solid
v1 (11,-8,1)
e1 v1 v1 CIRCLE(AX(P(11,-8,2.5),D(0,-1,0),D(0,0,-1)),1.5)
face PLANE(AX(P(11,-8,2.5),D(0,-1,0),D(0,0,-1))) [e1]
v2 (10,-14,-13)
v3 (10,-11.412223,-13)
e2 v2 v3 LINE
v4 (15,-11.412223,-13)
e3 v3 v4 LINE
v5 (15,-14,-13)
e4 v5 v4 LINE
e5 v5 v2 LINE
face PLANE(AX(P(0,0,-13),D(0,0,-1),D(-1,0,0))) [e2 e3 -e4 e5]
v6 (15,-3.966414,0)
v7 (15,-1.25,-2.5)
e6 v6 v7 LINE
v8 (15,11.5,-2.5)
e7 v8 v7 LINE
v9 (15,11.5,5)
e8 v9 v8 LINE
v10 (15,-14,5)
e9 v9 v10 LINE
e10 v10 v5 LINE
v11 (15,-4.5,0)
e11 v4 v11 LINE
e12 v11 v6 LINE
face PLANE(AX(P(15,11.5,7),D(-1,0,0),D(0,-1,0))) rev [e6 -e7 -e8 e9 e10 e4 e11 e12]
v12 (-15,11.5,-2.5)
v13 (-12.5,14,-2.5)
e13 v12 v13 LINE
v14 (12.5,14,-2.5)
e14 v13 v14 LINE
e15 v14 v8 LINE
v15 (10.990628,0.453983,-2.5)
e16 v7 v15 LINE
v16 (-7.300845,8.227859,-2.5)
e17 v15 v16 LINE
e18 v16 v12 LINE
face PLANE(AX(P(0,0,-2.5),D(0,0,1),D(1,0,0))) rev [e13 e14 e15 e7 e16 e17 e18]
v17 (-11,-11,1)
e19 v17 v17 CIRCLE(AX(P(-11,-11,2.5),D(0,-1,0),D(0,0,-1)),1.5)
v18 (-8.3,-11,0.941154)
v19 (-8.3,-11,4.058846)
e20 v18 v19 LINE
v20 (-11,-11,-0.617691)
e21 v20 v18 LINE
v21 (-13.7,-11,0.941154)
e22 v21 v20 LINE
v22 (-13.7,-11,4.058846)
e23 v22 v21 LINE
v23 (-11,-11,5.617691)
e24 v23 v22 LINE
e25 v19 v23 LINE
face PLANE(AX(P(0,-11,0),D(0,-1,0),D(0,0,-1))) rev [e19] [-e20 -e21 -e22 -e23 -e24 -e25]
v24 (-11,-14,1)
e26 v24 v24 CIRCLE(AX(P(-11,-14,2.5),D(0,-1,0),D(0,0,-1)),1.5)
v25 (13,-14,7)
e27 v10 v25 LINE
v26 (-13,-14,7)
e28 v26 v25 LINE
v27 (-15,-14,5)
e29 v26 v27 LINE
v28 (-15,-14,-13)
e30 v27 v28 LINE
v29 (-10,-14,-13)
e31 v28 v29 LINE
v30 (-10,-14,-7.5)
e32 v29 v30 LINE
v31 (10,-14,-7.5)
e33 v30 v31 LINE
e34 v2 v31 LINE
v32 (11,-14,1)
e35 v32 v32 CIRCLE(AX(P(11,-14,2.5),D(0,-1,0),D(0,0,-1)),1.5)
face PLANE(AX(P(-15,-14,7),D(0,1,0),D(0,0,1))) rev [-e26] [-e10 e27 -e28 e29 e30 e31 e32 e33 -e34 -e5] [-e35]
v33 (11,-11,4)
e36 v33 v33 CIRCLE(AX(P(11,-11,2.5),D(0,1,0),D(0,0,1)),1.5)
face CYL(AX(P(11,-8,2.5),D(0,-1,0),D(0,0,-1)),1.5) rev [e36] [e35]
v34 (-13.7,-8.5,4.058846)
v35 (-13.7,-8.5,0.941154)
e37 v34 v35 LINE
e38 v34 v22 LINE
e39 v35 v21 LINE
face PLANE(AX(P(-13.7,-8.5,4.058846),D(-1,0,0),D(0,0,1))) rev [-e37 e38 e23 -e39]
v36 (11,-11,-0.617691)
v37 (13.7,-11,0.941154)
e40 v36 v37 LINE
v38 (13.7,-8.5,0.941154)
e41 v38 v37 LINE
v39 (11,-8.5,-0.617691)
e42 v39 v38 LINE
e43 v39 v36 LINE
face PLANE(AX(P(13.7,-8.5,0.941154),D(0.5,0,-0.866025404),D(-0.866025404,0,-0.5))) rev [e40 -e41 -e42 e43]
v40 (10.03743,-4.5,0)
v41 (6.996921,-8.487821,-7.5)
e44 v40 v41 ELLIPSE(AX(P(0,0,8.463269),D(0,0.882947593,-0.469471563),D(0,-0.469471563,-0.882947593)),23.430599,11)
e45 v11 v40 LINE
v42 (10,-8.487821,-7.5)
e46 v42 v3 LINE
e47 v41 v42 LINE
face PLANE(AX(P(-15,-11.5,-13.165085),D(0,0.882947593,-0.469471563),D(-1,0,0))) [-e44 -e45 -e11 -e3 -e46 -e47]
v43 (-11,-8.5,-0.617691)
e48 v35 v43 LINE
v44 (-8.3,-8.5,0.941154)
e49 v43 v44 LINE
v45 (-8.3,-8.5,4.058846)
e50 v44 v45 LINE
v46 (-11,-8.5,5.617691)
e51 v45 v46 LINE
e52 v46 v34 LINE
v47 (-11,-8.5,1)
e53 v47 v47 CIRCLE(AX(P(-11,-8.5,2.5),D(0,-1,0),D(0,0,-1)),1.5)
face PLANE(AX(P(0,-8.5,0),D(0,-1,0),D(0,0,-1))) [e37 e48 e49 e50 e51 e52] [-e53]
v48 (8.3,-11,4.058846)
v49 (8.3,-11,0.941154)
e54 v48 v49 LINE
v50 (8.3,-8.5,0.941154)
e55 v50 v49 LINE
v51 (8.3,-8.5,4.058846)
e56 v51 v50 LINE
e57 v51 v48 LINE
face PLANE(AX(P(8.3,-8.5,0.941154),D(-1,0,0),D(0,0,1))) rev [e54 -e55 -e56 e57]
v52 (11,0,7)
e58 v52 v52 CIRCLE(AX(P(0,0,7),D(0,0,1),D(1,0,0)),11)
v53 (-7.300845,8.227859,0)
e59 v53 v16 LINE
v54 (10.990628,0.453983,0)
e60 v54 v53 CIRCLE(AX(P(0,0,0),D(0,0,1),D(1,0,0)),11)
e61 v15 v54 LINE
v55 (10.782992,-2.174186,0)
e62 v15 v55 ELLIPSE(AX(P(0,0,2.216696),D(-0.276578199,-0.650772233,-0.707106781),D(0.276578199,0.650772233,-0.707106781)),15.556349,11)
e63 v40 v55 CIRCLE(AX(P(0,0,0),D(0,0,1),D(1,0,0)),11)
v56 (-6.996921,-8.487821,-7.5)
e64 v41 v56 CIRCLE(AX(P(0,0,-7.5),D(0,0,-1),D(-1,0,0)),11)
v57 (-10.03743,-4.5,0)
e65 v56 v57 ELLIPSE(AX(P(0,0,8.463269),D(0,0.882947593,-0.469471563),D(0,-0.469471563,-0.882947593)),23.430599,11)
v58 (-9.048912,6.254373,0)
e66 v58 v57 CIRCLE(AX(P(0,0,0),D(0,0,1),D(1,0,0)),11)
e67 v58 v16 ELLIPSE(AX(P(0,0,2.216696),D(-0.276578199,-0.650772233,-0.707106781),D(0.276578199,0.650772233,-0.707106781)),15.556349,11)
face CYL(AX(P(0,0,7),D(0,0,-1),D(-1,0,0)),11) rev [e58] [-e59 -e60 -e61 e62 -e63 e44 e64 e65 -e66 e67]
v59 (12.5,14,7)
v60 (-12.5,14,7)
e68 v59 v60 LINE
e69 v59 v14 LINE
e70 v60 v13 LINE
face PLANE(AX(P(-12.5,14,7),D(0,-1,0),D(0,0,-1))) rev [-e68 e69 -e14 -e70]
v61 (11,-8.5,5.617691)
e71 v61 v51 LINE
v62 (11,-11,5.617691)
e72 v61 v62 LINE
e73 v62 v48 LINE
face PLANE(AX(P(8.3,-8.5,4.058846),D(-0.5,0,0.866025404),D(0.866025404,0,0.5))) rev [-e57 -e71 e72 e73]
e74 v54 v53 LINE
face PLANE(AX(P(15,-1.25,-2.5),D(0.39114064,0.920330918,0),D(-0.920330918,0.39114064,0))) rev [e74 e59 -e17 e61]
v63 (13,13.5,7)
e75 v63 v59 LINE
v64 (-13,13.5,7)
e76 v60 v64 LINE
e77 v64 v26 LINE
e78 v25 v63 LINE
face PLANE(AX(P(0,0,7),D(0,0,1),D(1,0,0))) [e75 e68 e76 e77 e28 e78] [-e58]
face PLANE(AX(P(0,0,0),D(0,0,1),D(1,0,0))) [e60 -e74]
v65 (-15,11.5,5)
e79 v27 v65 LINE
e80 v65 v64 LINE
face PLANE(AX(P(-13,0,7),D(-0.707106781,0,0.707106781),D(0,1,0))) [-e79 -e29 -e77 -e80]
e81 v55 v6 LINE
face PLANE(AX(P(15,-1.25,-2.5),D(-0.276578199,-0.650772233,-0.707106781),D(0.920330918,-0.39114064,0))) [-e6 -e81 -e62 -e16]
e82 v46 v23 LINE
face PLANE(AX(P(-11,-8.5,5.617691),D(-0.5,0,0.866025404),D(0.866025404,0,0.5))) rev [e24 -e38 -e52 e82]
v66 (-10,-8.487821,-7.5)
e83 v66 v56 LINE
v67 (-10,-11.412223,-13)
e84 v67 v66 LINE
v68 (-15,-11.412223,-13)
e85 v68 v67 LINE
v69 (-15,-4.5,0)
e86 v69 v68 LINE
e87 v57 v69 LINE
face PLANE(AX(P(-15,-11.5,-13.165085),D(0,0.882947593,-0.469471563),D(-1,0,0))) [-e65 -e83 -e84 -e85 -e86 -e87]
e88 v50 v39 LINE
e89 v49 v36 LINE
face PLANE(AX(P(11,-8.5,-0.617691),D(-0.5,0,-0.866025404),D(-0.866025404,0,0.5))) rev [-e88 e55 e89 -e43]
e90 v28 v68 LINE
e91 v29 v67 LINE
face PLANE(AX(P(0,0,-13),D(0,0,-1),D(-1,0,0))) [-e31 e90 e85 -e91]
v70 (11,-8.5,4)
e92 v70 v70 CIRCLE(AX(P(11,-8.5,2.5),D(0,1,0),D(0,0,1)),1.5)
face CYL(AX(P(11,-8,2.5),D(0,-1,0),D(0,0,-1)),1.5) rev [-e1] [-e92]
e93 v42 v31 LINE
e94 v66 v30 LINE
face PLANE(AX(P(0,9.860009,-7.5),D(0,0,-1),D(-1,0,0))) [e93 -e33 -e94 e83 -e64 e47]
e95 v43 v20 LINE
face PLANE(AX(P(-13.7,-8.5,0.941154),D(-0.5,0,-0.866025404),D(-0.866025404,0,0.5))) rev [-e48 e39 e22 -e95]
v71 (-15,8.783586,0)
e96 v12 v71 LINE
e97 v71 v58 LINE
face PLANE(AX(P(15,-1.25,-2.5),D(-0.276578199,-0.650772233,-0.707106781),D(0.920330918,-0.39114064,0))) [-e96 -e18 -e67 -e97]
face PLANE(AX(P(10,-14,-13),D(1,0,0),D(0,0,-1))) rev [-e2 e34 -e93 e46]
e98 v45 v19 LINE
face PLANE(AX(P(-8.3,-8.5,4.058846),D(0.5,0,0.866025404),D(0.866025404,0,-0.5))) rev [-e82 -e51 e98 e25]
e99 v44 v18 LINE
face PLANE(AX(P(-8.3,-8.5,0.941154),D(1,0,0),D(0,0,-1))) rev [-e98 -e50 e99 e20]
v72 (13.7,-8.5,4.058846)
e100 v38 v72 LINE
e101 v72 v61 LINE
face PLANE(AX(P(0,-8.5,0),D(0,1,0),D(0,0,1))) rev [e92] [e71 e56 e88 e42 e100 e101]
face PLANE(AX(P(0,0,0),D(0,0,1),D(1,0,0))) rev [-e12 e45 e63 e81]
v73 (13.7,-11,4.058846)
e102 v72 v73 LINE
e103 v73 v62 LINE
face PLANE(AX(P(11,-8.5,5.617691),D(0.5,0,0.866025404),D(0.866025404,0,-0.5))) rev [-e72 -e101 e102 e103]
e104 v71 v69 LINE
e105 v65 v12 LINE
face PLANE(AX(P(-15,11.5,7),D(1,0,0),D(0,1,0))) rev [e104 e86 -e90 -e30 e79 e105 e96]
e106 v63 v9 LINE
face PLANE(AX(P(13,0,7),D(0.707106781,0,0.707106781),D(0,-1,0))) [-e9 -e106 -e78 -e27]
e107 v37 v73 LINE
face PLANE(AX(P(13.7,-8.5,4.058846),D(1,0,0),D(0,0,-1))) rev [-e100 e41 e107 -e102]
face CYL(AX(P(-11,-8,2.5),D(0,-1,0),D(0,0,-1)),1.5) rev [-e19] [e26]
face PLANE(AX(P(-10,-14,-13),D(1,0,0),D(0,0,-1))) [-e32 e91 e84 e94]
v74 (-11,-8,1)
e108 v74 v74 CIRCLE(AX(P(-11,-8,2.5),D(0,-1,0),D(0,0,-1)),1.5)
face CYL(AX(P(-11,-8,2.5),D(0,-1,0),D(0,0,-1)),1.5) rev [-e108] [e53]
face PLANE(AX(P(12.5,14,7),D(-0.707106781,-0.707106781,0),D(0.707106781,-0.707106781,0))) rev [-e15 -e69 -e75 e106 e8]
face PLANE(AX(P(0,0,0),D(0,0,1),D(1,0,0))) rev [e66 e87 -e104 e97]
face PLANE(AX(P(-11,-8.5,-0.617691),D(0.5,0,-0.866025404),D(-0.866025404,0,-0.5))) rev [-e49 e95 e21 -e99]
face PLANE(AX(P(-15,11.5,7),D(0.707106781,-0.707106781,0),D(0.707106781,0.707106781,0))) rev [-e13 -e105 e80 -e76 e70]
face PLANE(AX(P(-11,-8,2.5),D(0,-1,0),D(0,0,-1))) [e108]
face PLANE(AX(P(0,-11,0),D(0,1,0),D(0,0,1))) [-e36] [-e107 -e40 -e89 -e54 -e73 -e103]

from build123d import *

# Parameters (mm, degrees)
SKETCH1_R           = 11
BOSS_EXTRUDE1_DEPTH = 7
SKETCH2_W           = 5
SKETCH2_H           = 2.5
BOSS_EXTRUDE2_DEPTH = 13
CHAMFER2_SIZE       = 2
BOSS_EXTRUDE6_DEPTH = 2.5
CHAMFER3_SIZE       = 2
CHAMFER4_SIZE       = 2
BOSS_EXTRUDE4_DEPTH = 2.5
CHAMFER6_SIZE       = 2.5
CHAMFER7_SIZE       = 7
CHAMFER7_SIZE_2     = 13.165085257
CUT_EXTRUDE1_START  = -3
SKETCH6_R           = 1.5
CUT_EXTRUDE1_DEPTH  = 2.5
SKETCH7_R           = 1.5
CUT_EXTRUDE2_DEPTH  = 6


with BuildPart() as part:
    # Sketch1 → Boss-Extrude1 (new body)
    with BuildSketch(Plane.XY):
        Polygon((-15, 11.5), (-12.5, 14), (12.5, 14), (15, 11.5), (15, -14), (-15, -14), align=None)
        Circle(SKETCH1_R, mode=Mode.SUBTRACT)
    extrude(amount=BOSS_EXTRUDE1_DEPTH)

    # Sketch2 → Boss-Extrude2 (add)
    with BuildSketch(Plane(origin=(0, 0, 0), x_dir=(-1, 0, 0), z_dir=(0, 0, -1))):
        with Locations((-12.5, -12.75)):
            Rectangle(SKETCH2_W, SKETCH2_H)
        with Locations((12.5, -12.75)):
            Rectangle(SKETCH2_W, SKETCH2_H)
    extrude(amount=BOSS_EXTRUDE2_DEPTH)

    # Chamfer2
    chamfer2_edges = [part.edges().sort_by_distance(p)[0] for p in [
        (-10, -12.75, 0),
        (10, -12.75, 0),
    ]]
    chamfer(chamfer2_edges, length=CHAMFER2_SIZE)

    # Sketch5 → Boss-Extrude6 (add)
    with BuildSketch(Plane.XZ.offset(14)):
        Polygon((-10, -2), (-10, -7.5), (10, -7.5), (10, -2), (8, 0), (-8, 0), align=None)
    extrude(amount=-BOSS_EXTRUDE6_DEPTH)

    # Chamfer3
    chamfer3_edges = [part.edges().sort_by_distance(p)[0] for p in [
        (15, -1.25, 7),
    ]]
    chamfer(chamfer3_edges, length=CHAMFER3_SIZE)

    # Chamfer4
    chamfer4_edges = [part.edges().sort_by_distance(p)[0] for p in [
        (-15, -1.25, 7),
    ]]
    chamfer(chamfer4_edges, length=CHAMFER4_SIZE)

    # Sketch4 → Boss-Extrude4 (add)
    with BuildSketch(Plane(origin=(0, 0, 0), x_dir=(-1, 0, 0), z_dir=(0, 0, -1))):
        Polygon((-15, -1.25), (15, 11.5), (12.5, 14), (-12.5, 14), (-15, 11.5), align=None)
    extrude(amount=BOSS_EXTRUDE4_DEPTH)

    # Chamfer6
    # the kernel refuses this chamfer: 2.5 mm, written as the material it adds along each edge
    with BuildSketch(Plane(origin=(20.916998416, -3.764724327, 0), x_dir=(-0.39099275668343275, -0.9199829569021947, 0.02749587661058635), z_dir=(-0.9203309184584746, 0.39114064034485174, 0))) as chamfer6_piece_1_section:
        Polygon((CHAMFER6_SIZE * 0.999621916911, -CHAMFER6_SIZE * 0.0274958766106), (-CHAMFER6_SIZE * 0.0274958766106, -CHAMFER6_SIZE * 0.999621916911), (0, 0), align=None)
    chamfer6_piece_1 = extrude(amount=17.214861222, mode=Mode.PRIVATE)
    chamfer6_piece_1 = chamfer6_piece_1 - Plane(origin=(0, 0, -0.830769879), x_dir=(1, 0, 0), z_dir=(0, 0, -1)) * Cylinder(11, 45, mode=Mode.PRIVATE)
    chamfer6_piece_1 = split(chamfer6_piece_1, bisect_by=Plane(origin=(15, -1.305255327, -0.830769879), z_dir=(-1, 0, 0)), keep=Keep.TOP, mode=Mode.PRIVATE)
    add(chamfer6_piece_1)
    with BuildSketch(Plane(origin=(-1.383846422, 5.71313473, 0), x_dir=(-0.39099275668343275, -0.9199829569021946, 0.02749587661058637), z_dir=(-0.9203309184584746, 0.39114064034485174, 0))) as chamfer6_piece_2_section:
        Polygon((CHAMFER6_SIZE * 0.999621916911, -CHAMFER6_SIZE * 0.0274958766106), (-CHAMFER6_SIZE * 0.0274958766106, -CHAMFER6_SIZE * 0.999621916911), (0, 0), align=None)
    chamfer6_piece_2 = extrude(amount=21.224052785, mode=Mode.PRIVATE)
    chamfer6_piece_2 = chamfer6_piece_2 - Plane(origin=(0, 0, -0.851096237), x_dir=(1, 0, 0), z_dir=(0, 0, -1)) * Cylinder(11, 53, mode=Mode.PRIVATE)
    chamfer6_piece_2 = split(chamfer6_piece_2, bisect_by=Plane(origin=(-15, 9.126408424, -0.851096237), z_dir=(1, 0, 0)), keep=Keep.TOP, mode=Mode.PRIVATE)
    add(chamfer6_piece_2)

    # Chamfer7
    # the kernel refuses this chamfer: 13.165085257, 7 mm, written as the material it adds along each edge
    with BuildSketch(Plane(origin=(-15, -11.5, 0), x_dir=(0, 0.9979482451756082, 0.06402577567608186), z_dir=(1, 0, 0))) as chamfer7_piece_1_section:
        Polygon((CHAMFER7_SIZE * 0.997948245176, -CHAMFER7_SIZE * 0.0640257756761), (-CHAMFER7_SIZE_2 * 0.0640257756781, -CHAMFER7_SIZE_2 * 0.997948245208), (0, 0), align=None)
    chamfer7_piece_1 = extrude(amount=30, mode=Mode.PRIVATE)
    chamfer7_piece_1 = chamfer7_piece_1 - Plane(origin=(0, 0, -3.073682767), x_dir=(1, 0, 0), z_dir=(0, 0, -1)) * Cylinder(11, 113, mode=Mode.PRIVATE)
    chamfer7_piece_1 = split(chamfer7_piece_1, bisect_by=Plane(origin=(-12.500128058, -8.887755394, -7.5), z_dir=(0, 0, 1)), keep=Keep.TOP, mode=Mode.PRIVATE)
    chamfer7_piece_1 = split(chamfer7_piece_1, bisect_by=Plane(origin=(-10, -8.887755394, -3.073682767), z_dir=(-1, 0, 0)), keep=Keep.TOP, mode=Mode.PRIVATE)
    add(chamfer7_piece_1)
    with BuildSketch(Plane(origin=(-15, -11.5, 0), x_dir=(0, 0.9979482451756082, 0.06402577567608186), z_dir=(1, 0, 0))) as chamfer7_piece_2_section:
        Polygon((CHAMFER7_SIZE * 0.997948245176, -CHAMFER7_SIZE * 0.0640257756761), (-CHAMFER7_SIZE_2 * 0.0640257756781, -CHAMFER7_SIZE_2 * 0.997948245208), (0, 0), align=None)
    chamfer7_piece_2 = extrude(amount=30, mode=Mode.PRIVATE)
    chamfer7_piece_2 = split(chamfer7_piece_2, bisect_by=Plane(origin=(-12.5, -10.721530873, -7.5), z_dir=(0, 0, -1)), keep=Keep.TOP, mode=Mode.PRIVATE)
    chamfer7_piece_2 = split(chamfer7_piece_2, bisect_by=Plane(origin=(-10, -10.721530873, -9.597564575), z_dir=(-1, 0, 0)), keep=Keep.TOP, mode=Mode.PRIVATE)
    chamfer7_piece_2 = split(chamfer7_piece_2, bisect_by=Plane(origin=(-12.5, -10.721530873, -13), z_dir=(0, 0, 1)), keep=Keep.TOP, mode=Mode.PRIVATE)
    add(chamfer7_piece_2)
    with BuildSketch(Plane(origin=(-15, -11.5, 0), x_dir=(0, 0.9979482451756082, 0.06402577567608186), z_dir=(1, 0, 0))) as chamfer7_piece_3_section:
        Polygon((CHAMFER7_SIZE * 0.997948245176, -CHAMFER7_SIZE * 0.0640257756761), (-CHAMFER7_SIZE_2 * 0.0640257756781, -CHAMFER7_SIZE_2 * 0.997948245208), (0, 0), align=None)
    chamfer7_piece_3 = extrude(amount=30, mode=Mode.PRIVATE)
    chamfer7_piece_3 = chamfer7_piece_3 - Plane(origin=(0, 0, -3.793876077), x_dir=(1, 0, 0), z_dir=(0, 0, -1)) * Cylinder(11, 113, mode=Mode.PRIVATE)
    chamfer7_piece_3 = split(chamfer7_piece_3, bisect_by=Plane(origin=(-9.499486782, -6.598719884, -7.5), z_dir=(0, 0, 1)), keep=Keep.TOP, mode=Mode.PRIVATE)
    chamfer7_piece_3 = split(chamfer7_piece_3, bisect_by=Plane(origin=(10, -6.598719884, -3.793876077), z_dir=(-1, 0, 0)), keep=Keep.TOP, mode=Mode.PRIVATE)
    chamfer7_piece_3 = split(chamfer7_piece_3, bisect_by=Plane(origin=(-10, -6.598719884, -3.793876077), z_dir=(1, 0, 0)), keep=Keep.TOP, mode=Mode.PRIVATE)
    add(chamfer7_piece_3)
    with BuildSketch(Plane(origin=(-15, -11.5, 0), x_dir=(0, 0.9979482451756082, 0.06402577567608186), z_dir=(1, 0, 0))) as chamfer7_piece_4_section:
        Polygon((CHAMFER7_SIZE * 0.997948245176, -CHAMFER7_SIZE * 0.0640257756761), (-CHAMFER7_SIZE_2 * 0.0640257756781, -CHAMFER7_SIZE_2 * 0.997948245208), (0, 0), align=None)
    chamfer7_piece_4 = extrude(amount=30, mode=Mode.PRIVATE)
    chamfer7_piece_4 = split(chamfer7_piece_4, bisect_by=Plane(origin=(12.5, -10.721530873, -7.5), z_dir=(0, 0, -1)), keep=Keep.TOP, mode=Mode.PRIVATE)
    chamfer7_piece_4 = split(chamfer7_piece_4, bisect_by=Plane(origin=(10, -10.721530873, -9.597564575), z_dir=(1, 0, 0)), keep=Keep.TOP, mode=Mode.PRIVATE)
    chamfer7_piece_4 = split(chamfer7_piece_4, bisect_by=Plane(origin=(12.5, -10.721530873, -13), z_dir=(0, 0, 1)), keep=Keep.TOP, mode=Mode.PRIVATE)
    add(chamfer7_piece_4)
    with BuildSketch(Plane(origin=(-15, -11.5, 0), x_dir=(0, 0.9979482451756082, 0.06402577567608186), z_dir=(1, 0, 0))) as chamfer7_piece_5_section:
        Polygon((CHAMFER7_SIZE * 0.997948245176, -CHAMFER7_SIZE * 0.0640257756761), (-CHAMFER7_SIZE_2 * 0.0640257756781, -CHAMFER7_SIZE_2 * 0.997948245208), (0, 0), align=None)
    chamfer7_piece_5 = extrude(amount=30, mode=Mode.PRIVATE)
    chamfer7_piece_5 = chamfer7_piece_5 - Plane(origin=(0, 0, -3.073682766), x_dir=(1, 0, 0), z_dir=(0, 0, -1)) * Cylinder(11, 113, mode=Mode.PRIVATE)
    chamfer7_piece_5 = split(chamfer7_piece_5, bisect_by=Plane(origin=(12.500128057, -8.887755394, -7.5), z_dir=(0, 0, 1)), keep=Keep.TOP, mode=Mode.PRIVATE)
    chamfer7_piece_5 = split(chamfer7_piece_5, bisect_by=Plane(origin=(10, -8.887755394, -3.073682766), z_dir=(1, 0, 0)), keep=Keep.TOP, mode=Mode.PRIVATE)
    add(chamfer7_piece_5)

    # Sketch6 → Cut-Extrude1 (cut)
    # profile 1 of 2: a face of its own
    with BuildSketch(Plane.XZ.offset(14).offset(CUT_EXTRUDE1_START)):
        Polygon((-8.3, 0.941154273), (-8.3, 4.058845727), (-11, 5.617691454), (-13.7, 4.058845727), (-13.7, 0.941154273), (-11, -0.617691454), align=None)
        with Locations(Location((-11, 2.5, 0), (0, 0, 270))):
            Circle(SKETCH6_R, mode=Mode.SUBTRACT)
    # profile 2 of 2: a face of its own
    with BuildSketch(Plane.XZ.offset(14).offset(CUT_EXTRUDE1_START)):
        Polygon((11, -0.617691454), (8.3, 0.941154273), (8.3, 4.058845727), (11, 5.617691454), (13.7, 4.058845727), (13.7, 0.941154273), align=None)
    extrude(amount=-CUT_EXTRUDE1_DEPTH, mode=Mode.SUBTRACT)

    # Sketch7 → Cut-Extrude2 (cut)
    with BuildSketch(Plane.XZ.offset(14)):
        with Locations(Location((11, 2.5, 0), (0, 0, 270))):
            Circle(SKETCH7_R)
        with Locations(Location((-11, 2.5, 0), (0, 0, 270))):
            Circle(SKETCH7_R)
    extrude(amount=-CUT_EXTRUDE2_DEPTH, mode=Mode.SUBTRACT)


solid = part.part
